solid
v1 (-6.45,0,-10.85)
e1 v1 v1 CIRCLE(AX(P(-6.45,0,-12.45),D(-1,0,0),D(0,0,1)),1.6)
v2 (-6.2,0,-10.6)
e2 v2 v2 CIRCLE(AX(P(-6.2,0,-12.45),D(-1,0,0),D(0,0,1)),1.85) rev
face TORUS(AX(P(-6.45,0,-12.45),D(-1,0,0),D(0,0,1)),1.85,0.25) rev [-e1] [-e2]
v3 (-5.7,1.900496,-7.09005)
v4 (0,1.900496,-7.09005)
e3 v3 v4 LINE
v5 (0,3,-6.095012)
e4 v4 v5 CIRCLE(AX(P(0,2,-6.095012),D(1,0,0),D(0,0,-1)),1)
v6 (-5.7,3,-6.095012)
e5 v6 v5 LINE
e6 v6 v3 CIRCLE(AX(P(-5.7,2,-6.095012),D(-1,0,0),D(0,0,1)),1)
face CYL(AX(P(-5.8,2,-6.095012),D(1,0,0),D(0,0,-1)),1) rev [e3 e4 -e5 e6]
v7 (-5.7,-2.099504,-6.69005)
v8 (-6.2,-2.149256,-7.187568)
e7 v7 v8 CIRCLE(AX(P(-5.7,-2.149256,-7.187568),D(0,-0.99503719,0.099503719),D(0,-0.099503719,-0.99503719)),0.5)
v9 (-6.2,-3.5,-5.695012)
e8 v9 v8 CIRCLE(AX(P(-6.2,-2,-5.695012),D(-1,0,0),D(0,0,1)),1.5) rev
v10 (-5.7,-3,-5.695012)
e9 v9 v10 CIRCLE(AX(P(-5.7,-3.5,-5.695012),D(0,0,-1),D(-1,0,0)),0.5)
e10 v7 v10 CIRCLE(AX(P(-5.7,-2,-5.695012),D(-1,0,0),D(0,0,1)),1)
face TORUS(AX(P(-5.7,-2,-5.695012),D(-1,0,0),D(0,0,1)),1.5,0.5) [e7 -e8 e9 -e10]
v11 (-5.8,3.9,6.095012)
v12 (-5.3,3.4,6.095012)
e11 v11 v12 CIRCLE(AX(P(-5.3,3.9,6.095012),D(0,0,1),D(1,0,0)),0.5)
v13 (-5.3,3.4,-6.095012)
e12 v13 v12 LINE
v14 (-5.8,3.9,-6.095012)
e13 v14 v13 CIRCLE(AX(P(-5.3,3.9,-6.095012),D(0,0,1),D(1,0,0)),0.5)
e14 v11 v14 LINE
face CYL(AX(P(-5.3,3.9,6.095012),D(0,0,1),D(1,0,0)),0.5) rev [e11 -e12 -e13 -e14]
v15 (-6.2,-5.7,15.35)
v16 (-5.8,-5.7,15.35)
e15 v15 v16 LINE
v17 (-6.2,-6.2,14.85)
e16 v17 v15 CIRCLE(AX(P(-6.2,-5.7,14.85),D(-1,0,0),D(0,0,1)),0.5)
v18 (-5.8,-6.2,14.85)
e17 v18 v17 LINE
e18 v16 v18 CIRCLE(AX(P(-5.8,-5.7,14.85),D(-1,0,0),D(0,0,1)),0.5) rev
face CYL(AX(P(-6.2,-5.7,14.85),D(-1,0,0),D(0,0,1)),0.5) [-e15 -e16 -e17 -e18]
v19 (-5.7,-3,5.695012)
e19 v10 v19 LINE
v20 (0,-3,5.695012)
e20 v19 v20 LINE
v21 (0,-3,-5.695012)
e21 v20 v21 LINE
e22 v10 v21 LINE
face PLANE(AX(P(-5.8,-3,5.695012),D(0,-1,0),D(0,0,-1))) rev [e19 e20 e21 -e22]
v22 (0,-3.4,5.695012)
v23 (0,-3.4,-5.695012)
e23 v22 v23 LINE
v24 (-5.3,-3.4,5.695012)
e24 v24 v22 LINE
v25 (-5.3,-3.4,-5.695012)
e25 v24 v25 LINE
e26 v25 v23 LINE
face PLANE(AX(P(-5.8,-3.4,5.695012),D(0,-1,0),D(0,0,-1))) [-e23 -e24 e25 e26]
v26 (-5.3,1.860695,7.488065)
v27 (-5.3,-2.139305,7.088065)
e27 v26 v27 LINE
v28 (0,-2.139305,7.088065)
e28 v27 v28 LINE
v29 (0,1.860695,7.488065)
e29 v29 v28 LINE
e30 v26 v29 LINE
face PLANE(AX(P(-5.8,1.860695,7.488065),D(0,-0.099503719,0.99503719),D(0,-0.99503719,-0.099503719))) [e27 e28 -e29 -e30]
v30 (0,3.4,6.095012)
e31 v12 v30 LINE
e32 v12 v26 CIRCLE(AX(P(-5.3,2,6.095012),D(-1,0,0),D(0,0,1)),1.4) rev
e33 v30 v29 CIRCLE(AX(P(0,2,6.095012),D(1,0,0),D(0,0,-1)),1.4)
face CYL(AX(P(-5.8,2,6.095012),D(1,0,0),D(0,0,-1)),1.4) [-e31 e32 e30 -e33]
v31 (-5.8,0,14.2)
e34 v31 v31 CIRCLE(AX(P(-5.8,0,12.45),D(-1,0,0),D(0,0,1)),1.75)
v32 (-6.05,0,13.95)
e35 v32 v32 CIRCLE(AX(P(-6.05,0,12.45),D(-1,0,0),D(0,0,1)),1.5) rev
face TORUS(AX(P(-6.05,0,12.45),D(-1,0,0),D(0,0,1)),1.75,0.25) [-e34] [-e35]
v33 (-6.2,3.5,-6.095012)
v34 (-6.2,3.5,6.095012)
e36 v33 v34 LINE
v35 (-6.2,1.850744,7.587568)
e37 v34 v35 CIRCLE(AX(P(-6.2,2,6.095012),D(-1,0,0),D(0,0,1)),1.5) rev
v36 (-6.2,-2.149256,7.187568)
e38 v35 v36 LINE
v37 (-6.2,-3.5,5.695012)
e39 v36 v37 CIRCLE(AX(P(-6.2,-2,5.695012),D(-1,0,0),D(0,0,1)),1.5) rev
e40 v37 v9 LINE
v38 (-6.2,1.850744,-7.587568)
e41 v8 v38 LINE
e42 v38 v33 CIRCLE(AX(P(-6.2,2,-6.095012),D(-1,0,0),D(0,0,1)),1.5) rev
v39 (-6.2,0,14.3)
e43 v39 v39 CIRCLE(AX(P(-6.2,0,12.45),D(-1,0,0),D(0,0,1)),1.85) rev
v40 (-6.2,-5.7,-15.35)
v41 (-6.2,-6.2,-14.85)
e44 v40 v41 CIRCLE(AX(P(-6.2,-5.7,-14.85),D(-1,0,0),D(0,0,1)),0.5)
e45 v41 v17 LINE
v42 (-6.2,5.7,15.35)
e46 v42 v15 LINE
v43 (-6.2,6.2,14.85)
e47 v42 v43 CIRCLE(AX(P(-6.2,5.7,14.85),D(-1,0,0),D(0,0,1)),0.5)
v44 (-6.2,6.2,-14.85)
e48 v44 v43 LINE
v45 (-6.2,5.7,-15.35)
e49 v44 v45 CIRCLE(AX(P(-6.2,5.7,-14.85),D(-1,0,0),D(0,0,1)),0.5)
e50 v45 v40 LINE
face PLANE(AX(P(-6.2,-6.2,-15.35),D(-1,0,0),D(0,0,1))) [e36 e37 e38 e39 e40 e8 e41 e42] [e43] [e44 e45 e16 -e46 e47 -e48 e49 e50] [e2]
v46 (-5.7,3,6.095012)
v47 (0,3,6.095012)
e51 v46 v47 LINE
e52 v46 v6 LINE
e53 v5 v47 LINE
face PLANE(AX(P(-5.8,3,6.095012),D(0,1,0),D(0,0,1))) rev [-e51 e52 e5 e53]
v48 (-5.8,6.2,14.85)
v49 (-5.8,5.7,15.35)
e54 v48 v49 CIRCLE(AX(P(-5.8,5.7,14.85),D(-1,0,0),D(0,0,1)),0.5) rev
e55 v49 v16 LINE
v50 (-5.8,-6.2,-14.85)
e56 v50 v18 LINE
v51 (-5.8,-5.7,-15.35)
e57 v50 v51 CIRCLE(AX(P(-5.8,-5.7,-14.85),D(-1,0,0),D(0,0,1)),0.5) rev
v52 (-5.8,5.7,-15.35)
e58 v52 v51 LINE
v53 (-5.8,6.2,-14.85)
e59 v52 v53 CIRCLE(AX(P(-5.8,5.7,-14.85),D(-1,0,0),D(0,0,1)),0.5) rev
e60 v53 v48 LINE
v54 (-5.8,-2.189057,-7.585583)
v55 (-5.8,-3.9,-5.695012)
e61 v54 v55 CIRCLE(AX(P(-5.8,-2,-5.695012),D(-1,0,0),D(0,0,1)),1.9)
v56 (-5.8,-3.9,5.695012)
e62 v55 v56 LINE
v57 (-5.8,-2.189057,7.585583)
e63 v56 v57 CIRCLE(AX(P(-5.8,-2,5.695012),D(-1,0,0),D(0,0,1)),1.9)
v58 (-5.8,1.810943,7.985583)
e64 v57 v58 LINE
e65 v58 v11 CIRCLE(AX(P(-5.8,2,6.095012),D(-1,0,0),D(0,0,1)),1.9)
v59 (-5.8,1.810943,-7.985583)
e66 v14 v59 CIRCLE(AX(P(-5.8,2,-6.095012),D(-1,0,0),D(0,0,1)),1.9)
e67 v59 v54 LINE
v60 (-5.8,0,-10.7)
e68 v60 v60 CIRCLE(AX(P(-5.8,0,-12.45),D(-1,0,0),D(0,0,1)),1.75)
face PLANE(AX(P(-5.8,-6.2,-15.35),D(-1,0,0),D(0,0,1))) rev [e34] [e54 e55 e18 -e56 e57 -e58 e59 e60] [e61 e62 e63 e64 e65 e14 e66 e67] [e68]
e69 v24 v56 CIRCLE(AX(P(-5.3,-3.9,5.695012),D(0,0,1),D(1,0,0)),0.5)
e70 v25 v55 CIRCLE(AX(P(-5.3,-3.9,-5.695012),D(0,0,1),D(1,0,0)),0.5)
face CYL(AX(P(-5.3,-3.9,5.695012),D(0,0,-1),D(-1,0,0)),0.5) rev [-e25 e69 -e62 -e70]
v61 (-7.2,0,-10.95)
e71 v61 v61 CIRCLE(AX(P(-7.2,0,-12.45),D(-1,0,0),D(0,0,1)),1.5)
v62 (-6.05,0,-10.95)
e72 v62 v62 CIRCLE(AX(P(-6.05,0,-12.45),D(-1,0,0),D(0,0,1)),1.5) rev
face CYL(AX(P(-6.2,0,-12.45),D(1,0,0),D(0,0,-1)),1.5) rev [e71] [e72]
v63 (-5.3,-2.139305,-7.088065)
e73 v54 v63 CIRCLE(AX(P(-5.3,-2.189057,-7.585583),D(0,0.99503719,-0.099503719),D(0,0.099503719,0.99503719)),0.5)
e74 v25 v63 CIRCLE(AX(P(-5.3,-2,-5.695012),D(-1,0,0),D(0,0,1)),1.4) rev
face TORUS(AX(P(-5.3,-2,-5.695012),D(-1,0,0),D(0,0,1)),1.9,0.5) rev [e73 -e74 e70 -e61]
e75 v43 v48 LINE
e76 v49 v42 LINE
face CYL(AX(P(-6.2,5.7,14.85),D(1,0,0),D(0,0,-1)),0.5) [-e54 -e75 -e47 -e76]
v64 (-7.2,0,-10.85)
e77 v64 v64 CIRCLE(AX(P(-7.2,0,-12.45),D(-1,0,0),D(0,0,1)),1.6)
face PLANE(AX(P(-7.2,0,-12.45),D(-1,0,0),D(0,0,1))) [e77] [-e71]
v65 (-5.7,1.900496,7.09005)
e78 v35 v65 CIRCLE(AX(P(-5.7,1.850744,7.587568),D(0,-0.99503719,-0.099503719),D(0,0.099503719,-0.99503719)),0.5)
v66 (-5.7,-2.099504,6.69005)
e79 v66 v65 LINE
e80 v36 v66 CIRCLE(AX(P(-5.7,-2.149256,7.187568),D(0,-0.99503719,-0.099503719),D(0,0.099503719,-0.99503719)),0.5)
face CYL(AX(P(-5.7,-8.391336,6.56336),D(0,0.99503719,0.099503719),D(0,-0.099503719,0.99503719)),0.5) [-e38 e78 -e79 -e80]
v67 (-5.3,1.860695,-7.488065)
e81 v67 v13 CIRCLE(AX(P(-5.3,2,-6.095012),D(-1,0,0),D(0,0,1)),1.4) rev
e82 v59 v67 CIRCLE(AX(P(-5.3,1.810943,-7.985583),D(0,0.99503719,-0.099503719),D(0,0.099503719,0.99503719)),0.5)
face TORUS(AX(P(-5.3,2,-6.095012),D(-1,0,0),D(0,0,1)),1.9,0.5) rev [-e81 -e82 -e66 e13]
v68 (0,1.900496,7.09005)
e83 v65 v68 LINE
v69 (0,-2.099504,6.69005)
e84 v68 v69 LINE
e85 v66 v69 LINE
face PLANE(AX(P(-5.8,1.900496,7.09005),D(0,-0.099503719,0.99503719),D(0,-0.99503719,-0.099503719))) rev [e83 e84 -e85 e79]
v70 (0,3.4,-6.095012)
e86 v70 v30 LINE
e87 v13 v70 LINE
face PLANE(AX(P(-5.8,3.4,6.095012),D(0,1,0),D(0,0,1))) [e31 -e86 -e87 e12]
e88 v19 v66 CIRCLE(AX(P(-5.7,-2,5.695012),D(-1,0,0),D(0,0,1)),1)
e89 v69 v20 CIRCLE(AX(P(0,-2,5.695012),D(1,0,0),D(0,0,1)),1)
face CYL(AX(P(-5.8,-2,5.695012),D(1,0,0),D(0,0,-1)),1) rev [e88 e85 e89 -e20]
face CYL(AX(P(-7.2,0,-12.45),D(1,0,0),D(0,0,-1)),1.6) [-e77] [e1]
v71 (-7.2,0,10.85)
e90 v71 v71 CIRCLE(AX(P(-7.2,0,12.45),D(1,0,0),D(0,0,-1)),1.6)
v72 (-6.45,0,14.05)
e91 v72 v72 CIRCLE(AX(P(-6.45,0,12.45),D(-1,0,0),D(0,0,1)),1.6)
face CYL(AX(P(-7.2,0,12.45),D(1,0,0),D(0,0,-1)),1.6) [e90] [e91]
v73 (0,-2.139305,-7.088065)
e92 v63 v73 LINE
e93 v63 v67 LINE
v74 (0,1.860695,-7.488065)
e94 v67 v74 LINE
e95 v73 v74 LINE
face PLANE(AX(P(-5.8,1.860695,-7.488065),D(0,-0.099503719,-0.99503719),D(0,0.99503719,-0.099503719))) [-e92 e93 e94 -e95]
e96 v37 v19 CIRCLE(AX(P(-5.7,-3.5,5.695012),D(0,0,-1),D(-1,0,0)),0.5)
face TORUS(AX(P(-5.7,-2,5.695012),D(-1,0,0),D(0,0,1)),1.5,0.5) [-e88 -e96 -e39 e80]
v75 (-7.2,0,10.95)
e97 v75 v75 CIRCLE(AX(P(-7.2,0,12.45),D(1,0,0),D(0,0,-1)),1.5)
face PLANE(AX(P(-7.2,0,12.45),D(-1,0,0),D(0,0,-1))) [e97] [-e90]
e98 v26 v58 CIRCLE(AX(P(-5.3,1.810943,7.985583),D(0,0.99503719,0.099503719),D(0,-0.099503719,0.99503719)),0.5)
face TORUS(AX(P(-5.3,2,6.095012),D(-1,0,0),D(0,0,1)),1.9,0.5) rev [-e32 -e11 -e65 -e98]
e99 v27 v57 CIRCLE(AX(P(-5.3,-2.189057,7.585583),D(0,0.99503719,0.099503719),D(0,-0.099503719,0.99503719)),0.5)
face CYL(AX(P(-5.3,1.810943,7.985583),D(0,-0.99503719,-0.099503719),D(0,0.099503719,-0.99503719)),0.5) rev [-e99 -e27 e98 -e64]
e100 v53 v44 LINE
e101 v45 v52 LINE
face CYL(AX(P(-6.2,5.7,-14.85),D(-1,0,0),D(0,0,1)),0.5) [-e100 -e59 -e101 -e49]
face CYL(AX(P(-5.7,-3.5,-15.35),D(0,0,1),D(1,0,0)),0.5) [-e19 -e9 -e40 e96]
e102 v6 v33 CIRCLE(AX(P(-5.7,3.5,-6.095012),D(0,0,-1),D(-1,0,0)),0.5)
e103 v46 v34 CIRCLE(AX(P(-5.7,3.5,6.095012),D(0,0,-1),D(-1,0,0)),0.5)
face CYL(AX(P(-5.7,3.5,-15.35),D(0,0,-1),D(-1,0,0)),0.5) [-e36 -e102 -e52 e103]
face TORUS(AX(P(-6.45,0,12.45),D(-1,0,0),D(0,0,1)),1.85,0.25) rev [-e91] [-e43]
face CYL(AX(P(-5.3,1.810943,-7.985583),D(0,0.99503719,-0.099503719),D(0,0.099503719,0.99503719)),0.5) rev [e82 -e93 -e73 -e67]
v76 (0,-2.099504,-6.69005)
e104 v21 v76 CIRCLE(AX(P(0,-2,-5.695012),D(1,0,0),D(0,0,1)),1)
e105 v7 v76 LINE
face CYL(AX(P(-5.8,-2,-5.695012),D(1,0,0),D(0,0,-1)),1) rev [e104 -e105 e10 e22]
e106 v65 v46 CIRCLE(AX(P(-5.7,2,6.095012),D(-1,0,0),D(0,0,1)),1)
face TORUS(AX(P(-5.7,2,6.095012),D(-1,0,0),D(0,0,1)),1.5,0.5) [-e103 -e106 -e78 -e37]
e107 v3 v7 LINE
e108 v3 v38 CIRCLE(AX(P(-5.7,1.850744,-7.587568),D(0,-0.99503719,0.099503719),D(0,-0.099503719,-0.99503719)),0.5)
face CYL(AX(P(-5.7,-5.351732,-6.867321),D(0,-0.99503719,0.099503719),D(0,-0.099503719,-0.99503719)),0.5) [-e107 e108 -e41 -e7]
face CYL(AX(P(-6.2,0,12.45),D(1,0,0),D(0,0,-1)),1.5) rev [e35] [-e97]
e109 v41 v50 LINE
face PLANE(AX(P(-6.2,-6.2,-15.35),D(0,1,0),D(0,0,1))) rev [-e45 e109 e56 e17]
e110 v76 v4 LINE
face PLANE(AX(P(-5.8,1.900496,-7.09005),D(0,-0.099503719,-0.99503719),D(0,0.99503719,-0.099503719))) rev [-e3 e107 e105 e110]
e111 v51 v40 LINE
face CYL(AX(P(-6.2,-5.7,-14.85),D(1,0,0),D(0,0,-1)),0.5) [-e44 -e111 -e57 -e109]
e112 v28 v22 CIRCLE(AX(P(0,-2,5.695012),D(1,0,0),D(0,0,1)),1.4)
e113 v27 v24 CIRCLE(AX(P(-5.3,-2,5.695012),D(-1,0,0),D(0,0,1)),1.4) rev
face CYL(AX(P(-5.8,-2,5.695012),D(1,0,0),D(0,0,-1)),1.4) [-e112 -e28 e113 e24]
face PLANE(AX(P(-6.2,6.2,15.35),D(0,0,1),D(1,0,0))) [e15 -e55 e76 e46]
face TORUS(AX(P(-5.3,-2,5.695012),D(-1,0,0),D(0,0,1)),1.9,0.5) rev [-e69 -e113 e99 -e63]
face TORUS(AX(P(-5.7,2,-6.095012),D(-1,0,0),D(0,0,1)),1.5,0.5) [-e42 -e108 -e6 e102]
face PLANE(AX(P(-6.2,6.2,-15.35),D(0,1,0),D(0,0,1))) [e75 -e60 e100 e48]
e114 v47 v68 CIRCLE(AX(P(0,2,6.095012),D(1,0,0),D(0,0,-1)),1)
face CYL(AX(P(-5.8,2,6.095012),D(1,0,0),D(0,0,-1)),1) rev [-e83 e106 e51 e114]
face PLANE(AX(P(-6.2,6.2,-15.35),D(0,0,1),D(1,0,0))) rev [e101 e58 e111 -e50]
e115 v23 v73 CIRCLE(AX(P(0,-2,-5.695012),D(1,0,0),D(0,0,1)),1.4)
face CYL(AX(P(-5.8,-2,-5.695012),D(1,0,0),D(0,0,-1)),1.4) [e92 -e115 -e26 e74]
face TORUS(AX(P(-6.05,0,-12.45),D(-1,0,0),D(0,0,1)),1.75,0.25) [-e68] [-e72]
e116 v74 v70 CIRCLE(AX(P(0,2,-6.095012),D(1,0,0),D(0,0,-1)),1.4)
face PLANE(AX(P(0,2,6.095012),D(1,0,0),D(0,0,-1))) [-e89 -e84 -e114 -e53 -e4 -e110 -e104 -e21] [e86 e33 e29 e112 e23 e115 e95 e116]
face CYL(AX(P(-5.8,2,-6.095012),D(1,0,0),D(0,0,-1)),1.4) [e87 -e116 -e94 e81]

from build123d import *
from OCP.BRepAlgoAPI import BRepAlgoAPI_Cut
from OCP.TopTools import TopTools_ListOfShape

# Parameters (mm, degrees)
SM_BASE_FLANGE_2_DEPTH = 5.8
SKETCH_10_W            = 30.7
SKETCH_10_H            = 12.4
EXTRUDE_1_DEPTH        = 0.4
CUT_EXTRUDE_1_DEPTH    = 18.541450909
FILLET_1_R             = 0.5
SKETCH_13_R            = 1.5
CUT_EXTRUDE_2_DEPTH    = 18.541451065
FILLET_2_R             = 0.5
SKETCH_15_R            = 1.6
SKETCH_15_R_2          = 1.5
EXTRUDE_2_DEPTH        = 1
FILLET_3_R             = 0.25
FILLET_4_R             = 0.25


# Sheet-metal steps are written as plain solids
with BuildPart() as part:
    # 基体-法兰2: sheet metal written as solids
    # 草图1 → 基体-法兰2 (new body)
    with BuildSketch(Plane(origin=(0, 0, 0), x_dir=(0, 0, -1), z_dir=(1, 0, 0))):
        with BuildLine():
            Line((-6.095012438, 3.4), (6.095012438, 3.4))
            ThreePointArc((6.095012438, 3.4), (7.133045985, 2.939407449), (7.488064504, 1.860694793))
            Line((7.488064504, 1.860694793), (7.088064504, -2.139305207))
            ThreePointArc((7.088064504, -2.139305207), (6.634419887, -3.038033547), (5.695012438, -3.4))
            Line((5.695012438, -3.4), (-5.695012438, -3.4))
            ThreePointArc((-5.695012438, -3.4), (-6.634419887, -3.038033547), (-7.088064504, -2.139305207))
            Line((-7.088064504, -2.139305207), (-7.488064504, 1.860694793))
            ThreePointArc((-7.488064504, 1.860694793), (-7.133045985, 2.939407449), (-6.095012438, 3.4))
        make_face()
        with BuildLine():
            Line((-6.095012438, 3), (6.095012438, 3))
            ThreePointArc((6.095012438, 3), (6.836464971, 2.671005321), (7.090049628, 1.900496281))
            Line((7.090049628, 1.900496281), (6.690049628, -2.099503719))
            ThreePointArc((6.690049628, -2.099503719), (6.366017759, -2.741452534), (5.695012438, -3))
            Line((5.695012438, -3), (-5.695012438, -3))
            ThreePointArc((-5.695012438, -3), (-6.366017759, -2.741452534), (-6.690049628, -2.099503719))
            Line((-6.690049628, -2.099503719), (-7.090049628, 1.900496281))
            ThreePointArc((-7.090049628, 1.900496281), (-6.836464971, 2.671005321), (-6.095012438, 3))
        make_face(mode=Mode.SUBTRACT)
    extrude(amount=-SM_BASE_FLANGE_2_DEPTH)

    # 草图10 → 凸台-拉伸1 (add)
    with BuildSketch(Plane.ZY.offset(5.8)):
        Rectangle(SKETCH_10_W, SKETCH_10_H)
    extrude(amount=EXTRUDE_1_DEPTH)


with BuildPart() as cut_extrude_1_tool:
    # 草图11 → 切除-拉伸1 (new, through all)
    with BuildSketch(Plane(origin=(-5.8, 0, 0), x_dir=(0, 0, -1), z_dir=(1, 0, 0))):
        with BuildLine():
            Line((-7.085301548, 1.901695099), (-6.690168051, -2.098304901))
            ThreePointArc((-6.690168051, -2.098304901), (-6.366463531, -2.741048211), (-5.695011709, -3))
            Line((-5.695011709, -3), (5.695012438, -3))
            ThreePointArc((5.695012438, -3), (6.366017759, -2.741452534), (6.690049628, -2.099503719))
            Line((6.690049628, -2.099503719), (7.090049628, 1.900496281))
            ThreePointArc((7.090049628, 1.900496281), (6.836464971, 2.671005321), (6.095012438, 3))
            Line((6.095012438, 3), (-6.090145205, 3))
            ThreePointArc((-6.090145205, 3), (-6.831193416, 2.671451822), (-7.085301548, 1.901695099))
        make_face()
    extrude(amount=-CUT_EXTRUDE_1_DEPTH)


with BuildPart() as part_1:
    add(part.part)

    # 切除-拉伸1: cut by cut_extrude_1_tool, with a tolerance
    cut_extrude_1_stock = TopTools_ListOfShape()
    cut_extrude_1_stock.Append(part_1.part.wrapped)
    cut_extrude_1_tools = TopTools_ListOfShape()
    cut_extrude_1_tools.Append(cut_extrude_1_tool.part.wrapped)
    cut_extrude_1_cut = BRepAlgoAPI_Cut()
    cut_extrude_1_cut.SetArguments(cut_extrude_1_stock)
    cut_extrude_1_cut.SetTools(cut_extrude_1_tools)
    cut_extrude_1_cut.SetFuzzyValue(0.00001)
    cut_extrude_1_cut.Build()
    add(Compound.cast(cut_extrude_1_cut.Shape()).solids(), mode=Mode.REPLACE)

    # 圆角1
    fillet_1_edges = [part_1.edges().sort_by_distance(p)[0] for p in [
        (-6.2, -2.741452534, -6.366017759),
        (-6.2, -3, -3.65e-07),
        (-6.2, -2.741048211, 6.366463531),
        (-6.2, -0.098304901, 6.8877348),
        (-6.2, 2.671451822, 6.831193416),
        (-6.2, 3, -0.002433616),
        (-6.2, 2.671005321, -6.836464971),
        (-5.8, -3.038033547, -6.634419887),
        (-5.8, -3.4, 0),
        (-5.8, -3.038033547, 6.634419887),
        (-5.8, -0.139305207, 7.288064504),
        (-5.8, 2.939407449, 7.133045985),
        (-5.8, 3.4, 0),
        (-5.8, 2.939407449, -7.133045985),
        (-6.2, -0.099503719, -6.890049628),
        (-5.8, -0.139305207, -7.288064504),
    ]]
    fillet(fillet_1_edges, radius=FILLET_1_R)

    # 草图13 → 切除-拉伸2 (cut, through all)
    with BuildSketch(Plane(origin=(-5.8, 0, 0), x_dir=(0, 0, -1), z_dir=(1, 0, 0))):
        with Locations((12.45, 0)):
            Circle(SKETCH_13_R)
        with Locations(Location((-12.45, 0, 0), (0, 0, 180))):
            Circle(SKETCH_13_R)
    extrude(amount=-CUT_EXTRUDE_2_DEPTH, mode=Mode.SUBTRACT)

    # 圆角2
    fillet_2_edges = [part_1.edges().sort_by_distance(p)[0] for p in [
        (-6, 6.2, -15.35),
        (-6, -6.2, -15.35),
        (-6, -6.2, 15.35),
        (-6, 6.2, 15.35),
    ]]
    fillet(fillet_2_edges, radius=FILLET_2_R)

    # 草图15 → 凸台-拉伸2 (add)
    with BuildSketch(Plane.ZY.offset(6.2)):
        with Locations((-12.45, 0)):
            Circle(SKETCH_15_R)
        with Locations(Location((-12.45, 0, 0), (0, 0, 180))):
            Circle(SKETCH_15_R_2, mode=Mode.SUBTRACT)
    extrude_2 = extrude(amount=EXTRUDE_2_DEPTH)

    # 圆角3
    fillet_3_edges = [part_1.edges().sort_by_distance(p)[0] for p in [
        (-5.8, 0, -10.95),
        (-6.2, 0, -14.05),
    ]]
    fillet(fillet_3_edges, radius=FILLET_3_R)

    # 镜向1: 凸台-拉伸2 across plane
    add(extrude_2.mirror(Plane.XY))

    # 圆角4
    fillet_4_edges = [part_1.edges().sort_by_distance(p)[0] for p in [
        (-5.8, 0, 10.95),
        (-6.2, 0, 14.05),
    ]]
    fillet(fillet_4_edges, radius=FILLET_4_R)


solid = part_1.part
